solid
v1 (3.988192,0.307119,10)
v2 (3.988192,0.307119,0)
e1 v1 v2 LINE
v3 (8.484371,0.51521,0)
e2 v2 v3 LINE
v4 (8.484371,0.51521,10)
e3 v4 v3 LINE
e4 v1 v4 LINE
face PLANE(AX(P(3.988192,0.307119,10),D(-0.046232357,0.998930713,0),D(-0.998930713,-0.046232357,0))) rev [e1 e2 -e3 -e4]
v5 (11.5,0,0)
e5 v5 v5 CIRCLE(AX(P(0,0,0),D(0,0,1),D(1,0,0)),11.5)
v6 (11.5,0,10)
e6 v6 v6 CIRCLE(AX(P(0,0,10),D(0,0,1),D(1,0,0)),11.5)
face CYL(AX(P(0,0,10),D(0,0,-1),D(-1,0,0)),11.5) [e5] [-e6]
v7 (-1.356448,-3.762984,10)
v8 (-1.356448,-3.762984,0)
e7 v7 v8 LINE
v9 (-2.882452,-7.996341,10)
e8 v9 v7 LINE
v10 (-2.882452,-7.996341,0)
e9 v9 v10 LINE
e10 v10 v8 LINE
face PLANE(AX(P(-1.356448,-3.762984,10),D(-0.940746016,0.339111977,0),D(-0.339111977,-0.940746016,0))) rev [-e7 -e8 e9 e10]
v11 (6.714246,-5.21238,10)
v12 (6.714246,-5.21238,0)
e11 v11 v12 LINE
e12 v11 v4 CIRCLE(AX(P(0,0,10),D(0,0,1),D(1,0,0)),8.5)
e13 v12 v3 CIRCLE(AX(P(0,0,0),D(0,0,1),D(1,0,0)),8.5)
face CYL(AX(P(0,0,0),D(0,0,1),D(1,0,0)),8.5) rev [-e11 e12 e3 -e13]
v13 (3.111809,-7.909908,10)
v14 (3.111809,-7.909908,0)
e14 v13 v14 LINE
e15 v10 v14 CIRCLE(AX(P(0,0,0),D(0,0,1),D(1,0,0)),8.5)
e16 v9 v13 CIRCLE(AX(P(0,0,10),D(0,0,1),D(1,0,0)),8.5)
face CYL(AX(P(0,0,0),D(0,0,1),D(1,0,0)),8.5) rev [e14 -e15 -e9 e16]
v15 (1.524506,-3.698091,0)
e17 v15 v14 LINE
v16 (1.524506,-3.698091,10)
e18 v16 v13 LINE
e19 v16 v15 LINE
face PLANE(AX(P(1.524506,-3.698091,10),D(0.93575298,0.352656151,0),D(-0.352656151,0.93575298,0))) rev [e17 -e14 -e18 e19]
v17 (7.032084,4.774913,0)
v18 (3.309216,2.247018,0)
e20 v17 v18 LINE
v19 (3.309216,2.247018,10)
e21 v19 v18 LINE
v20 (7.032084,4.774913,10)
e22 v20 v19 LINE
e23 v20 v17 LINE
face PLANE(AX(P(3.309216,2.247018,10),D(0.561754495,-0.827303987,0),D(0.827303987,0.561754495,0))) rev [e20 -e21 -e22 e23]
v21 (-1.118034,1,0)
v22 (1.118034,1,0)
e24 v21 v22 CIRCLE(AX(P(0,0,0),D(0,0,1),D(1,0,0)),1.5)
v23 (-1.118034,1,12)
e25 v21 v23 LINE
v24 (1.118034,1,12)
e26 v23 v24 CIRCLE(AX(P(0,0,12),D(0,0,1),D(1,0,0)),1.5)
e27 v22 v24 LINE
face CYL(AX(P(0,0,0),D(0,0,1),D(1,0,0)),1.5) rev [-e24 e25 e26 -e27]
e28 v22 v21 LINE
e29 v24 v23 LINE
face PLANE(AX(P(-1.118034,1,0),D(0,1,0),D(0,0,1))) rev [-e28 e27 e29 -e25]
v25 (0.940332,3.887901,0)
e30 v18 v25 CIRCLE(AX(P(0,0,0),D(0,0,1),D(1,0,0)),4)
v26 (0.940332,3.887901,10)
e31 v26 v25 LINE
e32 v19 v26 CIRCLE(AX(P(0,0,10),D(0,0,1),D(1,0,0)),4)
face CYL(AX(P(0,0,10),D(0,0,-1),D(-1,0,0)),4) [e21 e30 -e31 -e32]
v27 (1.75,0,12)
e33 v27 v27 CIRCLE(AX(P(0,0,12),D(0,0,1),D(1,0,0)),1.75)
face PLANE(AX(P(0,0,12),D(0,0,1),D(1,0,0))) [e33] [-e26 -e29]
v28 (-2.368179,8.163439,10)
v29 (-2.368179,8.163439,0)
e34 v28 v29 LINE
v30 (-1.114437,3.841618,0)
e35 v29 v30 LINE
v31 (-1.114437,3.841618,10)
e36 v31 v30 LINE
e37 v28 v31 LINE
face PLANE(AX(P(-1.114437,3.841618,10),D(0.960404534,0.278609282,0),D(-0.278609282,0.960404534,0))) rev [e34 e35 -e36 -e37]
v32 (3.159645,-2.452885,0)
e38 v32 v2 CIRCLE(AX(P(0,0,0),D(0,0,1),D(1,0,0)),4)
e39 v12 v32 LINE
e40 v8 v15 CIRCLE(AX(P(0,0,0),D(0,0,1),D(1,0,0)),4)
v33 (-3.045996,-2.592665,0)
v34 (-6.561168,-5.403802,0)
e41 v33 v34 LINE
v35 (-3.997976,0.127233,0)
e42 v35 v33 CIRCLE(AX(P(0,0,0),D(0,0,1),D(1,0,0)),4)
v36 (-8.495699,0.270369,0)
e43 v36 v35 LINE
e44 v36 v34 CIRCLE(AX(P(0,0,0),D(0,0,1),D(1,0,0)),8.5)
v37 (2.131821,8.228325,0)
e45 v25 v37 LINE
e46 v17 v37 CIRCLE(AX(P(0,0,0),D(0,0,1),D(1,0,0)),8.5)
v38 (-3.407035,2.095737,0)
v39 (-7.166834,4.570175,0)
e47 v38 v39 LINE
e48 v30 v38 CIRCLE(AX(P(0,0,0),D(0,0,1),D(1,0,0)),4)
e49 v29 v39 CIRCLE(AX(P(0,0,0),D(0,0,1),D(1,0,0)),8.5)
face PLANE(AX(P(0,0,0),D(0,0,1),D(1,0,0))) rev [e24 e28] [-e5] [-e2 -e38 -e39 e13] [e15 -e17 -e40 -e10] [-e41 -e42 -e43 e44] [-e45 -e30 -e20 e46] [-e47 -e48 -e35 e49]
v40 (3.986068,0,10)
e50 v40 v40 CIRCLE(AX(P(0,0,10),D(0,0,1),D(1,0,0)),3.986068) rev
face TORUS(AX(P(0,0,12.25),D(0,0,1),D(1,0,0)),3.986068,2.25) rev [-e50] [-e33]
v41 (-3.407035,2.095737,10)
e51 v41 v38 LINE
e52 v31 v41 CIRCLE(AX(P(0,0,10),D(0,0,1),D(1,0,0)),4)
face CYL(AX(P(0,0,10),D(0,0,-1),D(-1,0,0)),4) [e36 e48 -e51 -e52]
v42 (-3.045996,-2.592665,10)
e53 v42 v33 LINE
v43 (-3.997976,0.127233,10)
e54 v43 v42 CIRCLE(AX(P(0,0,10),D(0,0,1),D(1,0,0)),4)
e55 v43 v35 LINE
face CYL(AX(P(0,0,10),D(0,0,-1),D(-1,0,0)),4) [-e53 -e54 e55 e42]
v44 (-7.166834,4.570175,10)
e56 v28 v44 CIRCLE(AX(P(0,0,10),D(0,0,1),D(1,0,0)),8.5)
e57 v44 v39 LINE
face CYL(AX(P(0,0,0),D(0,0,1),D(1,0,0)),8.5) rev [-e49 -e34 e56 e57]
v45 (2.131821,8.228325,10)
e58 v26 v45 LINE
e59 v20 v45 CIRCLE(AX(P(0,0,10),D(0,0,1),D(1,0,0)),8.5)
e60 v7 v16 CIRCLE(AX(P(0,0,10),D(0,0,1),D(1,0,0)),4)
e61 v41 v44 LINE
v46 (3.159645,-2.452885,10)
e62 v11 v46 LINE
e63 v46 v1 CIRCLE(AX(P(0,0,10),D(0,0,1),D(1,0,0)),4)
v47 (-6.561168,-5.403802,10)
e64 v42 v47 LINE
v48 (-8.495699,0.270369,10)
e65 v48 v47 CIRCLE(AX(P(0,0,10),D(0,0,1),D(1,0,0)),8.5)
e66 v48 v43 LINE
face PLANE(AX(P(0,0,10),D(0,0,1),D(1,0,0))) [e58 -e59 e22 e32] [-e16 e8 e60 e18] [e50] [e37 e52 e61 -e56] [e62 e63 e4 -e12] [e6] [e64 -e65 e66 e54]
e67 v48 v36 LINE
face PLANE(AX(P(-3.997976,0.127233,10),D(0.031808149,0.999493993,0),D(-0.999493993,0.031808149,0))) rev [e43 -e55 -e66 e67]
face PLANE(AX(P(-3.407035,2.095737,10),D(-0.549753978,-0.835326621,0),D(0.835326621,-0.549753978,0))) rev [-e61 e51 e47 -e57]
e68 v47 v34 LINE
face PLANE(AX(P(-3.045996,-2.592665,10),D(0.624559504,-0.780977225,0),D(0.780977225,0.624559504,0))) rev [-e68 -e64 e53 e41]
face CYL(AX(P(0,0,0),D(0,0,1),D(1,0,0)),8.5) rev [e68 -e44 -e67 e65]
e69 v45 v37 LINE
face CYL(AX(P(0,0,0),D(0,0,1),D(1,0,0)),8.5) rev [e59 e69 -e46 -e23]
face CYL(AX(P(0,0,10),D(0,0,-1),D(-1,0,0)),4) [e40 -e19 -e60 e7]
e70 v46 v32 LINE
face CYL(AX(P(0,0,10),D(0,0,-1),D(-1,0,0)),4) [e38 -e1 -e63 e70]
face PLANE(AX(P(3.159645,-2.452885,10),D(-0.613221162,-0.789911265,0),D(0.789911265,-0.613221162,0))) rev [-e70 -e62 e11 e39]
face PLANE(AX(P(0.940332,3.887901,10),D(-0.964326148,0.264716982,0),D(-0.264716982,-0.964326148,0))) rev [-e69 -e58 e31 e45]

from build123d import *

# Parameters (mm, degrees)
SKETCH1_R           = 11.5
BOSS_EXTRUDE1_DEPTH = 10
SKETCH2_R           = 8.5
CUT_EXTRUDE2_DEPTH  = 10
SKETCH4_R           = 4
BOSS_EXTRUDE2_DEPTH = 10
BOSS_EXTRUDE3_START = 10
BOSS_EXTRUDE3_DEPTH = 10
CIRPATTERN1_COUNT   = 5
CUT_EXTRUDE4_DEPTH  = 10
SKETCH8_R           = 1.75
BOSS_EXTRUDE4_DEPTH = 2
CUT_EXTRUDE5_DEPTH  = 2
FILLET1_R           = 2.25


with BuildPart() as part:
    # Sketch1 → Boss-Extrude1 (new body)
    with BuildSketch(Plane.XY):
        Circle(SKETCH1_R)
    extrude(amount=BOSS_EXTRUDE1_DEPTH)

    # Sketch2 → Cut-Extrude2 (cut)
    with BuildSketch(Plane.XY.offset(10)):
        Circle(SKETCH2_R)
    extrude(amount=-CUT_EXTRUDE2_DEPTH, mode=Mode.SUBTRACT)



with BuildPart() as body_2:
    # Sketch4 → Boss-Extrude2 (new body)
    with BuildSketch(Plane.XY):
        Circle(SKETCH4_R)
    extrude(amount=BOSS_EXTRUDE2_DEPTH)


with BuildPart() as part_1:
    add(part.part)

    add(body_2.part)  # Boss-Extrude3 merges body 2
    # Sketch6 → Boss-Extrude3 (add)
    with BuildSketch(Plane.XY.offset(BOSS_EXTRUDE3_START)):
        with BuildLine():
            Line((-1.114437127, 3.841618134), (-2.368178894, 8.163438536))
            ThreePointArc((-2.368178894, 8.163438536), (-0.122551325, 8.499116494), (2.131821106, 8.228325393))
            Line((2.131821106, 8.228325393), (0.940332104, 3.887901173))
            ThreePointArc((0.940332104, 3.887901173), (-0.090075911, 3.998985663), (-1.114437127, 3.841618134))
        make_face()
    boss_extrude3 = extrude(amount=-BOSS_EXTRUDE3_DEPTH)

    # CirPattern1: Boss-Extrude3 ×5 about axis
    cirpattern1_axis = Axis((0, 0, 0), (0, 0, 1))
    for i in range(1, CIRPATTERN1_COUNT):
        add(boss_extrude3.rotate(cirpattern1_axis, i * 360 / CIRPATTERN1_COUNT))

    # Sketch7 → Cut-Extrude4 (cut)
    with BuildSketch(Plane.XY.offset(10)):
        with BuildLine():
            Line((-1.118033989, 1), (1.118033989, 1))
            ThreePointArc((1.118033989, 1), (0, -1.5), (-1.118033989, 1))
        make_face()
    extrude(amount=-CUT_EXTRUDE4_DEPTH, mode=Mode.SUBTRACT)

    # Sketch8 → Boss-Extrude4 (add)
    with BuildSketch(Plane.XY.offset(10)):
        Circle(SKETCH8_R)
    extrude(amount=BOSS_EXTRUDE4_DEPTH)

    # Sketch9 → Cut-Extrude5 (cut)
    with BuildSketch(Plane.XY.offset(12)):
        with BuildLine():
            Line((-1.118033989, 1), (1.118033989, 1))
            ThreePointArc((1.118033989, 1), (0, -1.5), (-1.118033989, 1))
        make_face()
    extrude(amount=-CUT_EXTRUDE5_DEPTH, mode=Mode.SUBTRACT)

    # Fillet1
    # the kernel refuses this fillet: 2.25 mm, written as the material it adds along each edge
    with BuildSketch(Plane(origin=(0, 0, 10), x_dir=(1, 0, 0), z_dir=(0, -1, 0))) as fillet1_piece_1:
        with BuildLine():
            CenterArc((3.986067977, 2.25), FILLET1_R, 186.379370208, 83.620629792)
            Line((1.75, 2), (1.70527864, 1.995))
            ThreePointArc((1.70527864, 1.995), (1.705, 1), (1.705, 0))
            Line((1.705, 0), (1.75, -0.045))
            Line((1.75, -0.045), (3.986067977, -0.045))
            Line((3.986067977, -0.045), (3.986067977, 0))
        make_face()
    revolve(axis=Axis((0, 0, 10), (0, 0, 1)))


solid = part_1.part
